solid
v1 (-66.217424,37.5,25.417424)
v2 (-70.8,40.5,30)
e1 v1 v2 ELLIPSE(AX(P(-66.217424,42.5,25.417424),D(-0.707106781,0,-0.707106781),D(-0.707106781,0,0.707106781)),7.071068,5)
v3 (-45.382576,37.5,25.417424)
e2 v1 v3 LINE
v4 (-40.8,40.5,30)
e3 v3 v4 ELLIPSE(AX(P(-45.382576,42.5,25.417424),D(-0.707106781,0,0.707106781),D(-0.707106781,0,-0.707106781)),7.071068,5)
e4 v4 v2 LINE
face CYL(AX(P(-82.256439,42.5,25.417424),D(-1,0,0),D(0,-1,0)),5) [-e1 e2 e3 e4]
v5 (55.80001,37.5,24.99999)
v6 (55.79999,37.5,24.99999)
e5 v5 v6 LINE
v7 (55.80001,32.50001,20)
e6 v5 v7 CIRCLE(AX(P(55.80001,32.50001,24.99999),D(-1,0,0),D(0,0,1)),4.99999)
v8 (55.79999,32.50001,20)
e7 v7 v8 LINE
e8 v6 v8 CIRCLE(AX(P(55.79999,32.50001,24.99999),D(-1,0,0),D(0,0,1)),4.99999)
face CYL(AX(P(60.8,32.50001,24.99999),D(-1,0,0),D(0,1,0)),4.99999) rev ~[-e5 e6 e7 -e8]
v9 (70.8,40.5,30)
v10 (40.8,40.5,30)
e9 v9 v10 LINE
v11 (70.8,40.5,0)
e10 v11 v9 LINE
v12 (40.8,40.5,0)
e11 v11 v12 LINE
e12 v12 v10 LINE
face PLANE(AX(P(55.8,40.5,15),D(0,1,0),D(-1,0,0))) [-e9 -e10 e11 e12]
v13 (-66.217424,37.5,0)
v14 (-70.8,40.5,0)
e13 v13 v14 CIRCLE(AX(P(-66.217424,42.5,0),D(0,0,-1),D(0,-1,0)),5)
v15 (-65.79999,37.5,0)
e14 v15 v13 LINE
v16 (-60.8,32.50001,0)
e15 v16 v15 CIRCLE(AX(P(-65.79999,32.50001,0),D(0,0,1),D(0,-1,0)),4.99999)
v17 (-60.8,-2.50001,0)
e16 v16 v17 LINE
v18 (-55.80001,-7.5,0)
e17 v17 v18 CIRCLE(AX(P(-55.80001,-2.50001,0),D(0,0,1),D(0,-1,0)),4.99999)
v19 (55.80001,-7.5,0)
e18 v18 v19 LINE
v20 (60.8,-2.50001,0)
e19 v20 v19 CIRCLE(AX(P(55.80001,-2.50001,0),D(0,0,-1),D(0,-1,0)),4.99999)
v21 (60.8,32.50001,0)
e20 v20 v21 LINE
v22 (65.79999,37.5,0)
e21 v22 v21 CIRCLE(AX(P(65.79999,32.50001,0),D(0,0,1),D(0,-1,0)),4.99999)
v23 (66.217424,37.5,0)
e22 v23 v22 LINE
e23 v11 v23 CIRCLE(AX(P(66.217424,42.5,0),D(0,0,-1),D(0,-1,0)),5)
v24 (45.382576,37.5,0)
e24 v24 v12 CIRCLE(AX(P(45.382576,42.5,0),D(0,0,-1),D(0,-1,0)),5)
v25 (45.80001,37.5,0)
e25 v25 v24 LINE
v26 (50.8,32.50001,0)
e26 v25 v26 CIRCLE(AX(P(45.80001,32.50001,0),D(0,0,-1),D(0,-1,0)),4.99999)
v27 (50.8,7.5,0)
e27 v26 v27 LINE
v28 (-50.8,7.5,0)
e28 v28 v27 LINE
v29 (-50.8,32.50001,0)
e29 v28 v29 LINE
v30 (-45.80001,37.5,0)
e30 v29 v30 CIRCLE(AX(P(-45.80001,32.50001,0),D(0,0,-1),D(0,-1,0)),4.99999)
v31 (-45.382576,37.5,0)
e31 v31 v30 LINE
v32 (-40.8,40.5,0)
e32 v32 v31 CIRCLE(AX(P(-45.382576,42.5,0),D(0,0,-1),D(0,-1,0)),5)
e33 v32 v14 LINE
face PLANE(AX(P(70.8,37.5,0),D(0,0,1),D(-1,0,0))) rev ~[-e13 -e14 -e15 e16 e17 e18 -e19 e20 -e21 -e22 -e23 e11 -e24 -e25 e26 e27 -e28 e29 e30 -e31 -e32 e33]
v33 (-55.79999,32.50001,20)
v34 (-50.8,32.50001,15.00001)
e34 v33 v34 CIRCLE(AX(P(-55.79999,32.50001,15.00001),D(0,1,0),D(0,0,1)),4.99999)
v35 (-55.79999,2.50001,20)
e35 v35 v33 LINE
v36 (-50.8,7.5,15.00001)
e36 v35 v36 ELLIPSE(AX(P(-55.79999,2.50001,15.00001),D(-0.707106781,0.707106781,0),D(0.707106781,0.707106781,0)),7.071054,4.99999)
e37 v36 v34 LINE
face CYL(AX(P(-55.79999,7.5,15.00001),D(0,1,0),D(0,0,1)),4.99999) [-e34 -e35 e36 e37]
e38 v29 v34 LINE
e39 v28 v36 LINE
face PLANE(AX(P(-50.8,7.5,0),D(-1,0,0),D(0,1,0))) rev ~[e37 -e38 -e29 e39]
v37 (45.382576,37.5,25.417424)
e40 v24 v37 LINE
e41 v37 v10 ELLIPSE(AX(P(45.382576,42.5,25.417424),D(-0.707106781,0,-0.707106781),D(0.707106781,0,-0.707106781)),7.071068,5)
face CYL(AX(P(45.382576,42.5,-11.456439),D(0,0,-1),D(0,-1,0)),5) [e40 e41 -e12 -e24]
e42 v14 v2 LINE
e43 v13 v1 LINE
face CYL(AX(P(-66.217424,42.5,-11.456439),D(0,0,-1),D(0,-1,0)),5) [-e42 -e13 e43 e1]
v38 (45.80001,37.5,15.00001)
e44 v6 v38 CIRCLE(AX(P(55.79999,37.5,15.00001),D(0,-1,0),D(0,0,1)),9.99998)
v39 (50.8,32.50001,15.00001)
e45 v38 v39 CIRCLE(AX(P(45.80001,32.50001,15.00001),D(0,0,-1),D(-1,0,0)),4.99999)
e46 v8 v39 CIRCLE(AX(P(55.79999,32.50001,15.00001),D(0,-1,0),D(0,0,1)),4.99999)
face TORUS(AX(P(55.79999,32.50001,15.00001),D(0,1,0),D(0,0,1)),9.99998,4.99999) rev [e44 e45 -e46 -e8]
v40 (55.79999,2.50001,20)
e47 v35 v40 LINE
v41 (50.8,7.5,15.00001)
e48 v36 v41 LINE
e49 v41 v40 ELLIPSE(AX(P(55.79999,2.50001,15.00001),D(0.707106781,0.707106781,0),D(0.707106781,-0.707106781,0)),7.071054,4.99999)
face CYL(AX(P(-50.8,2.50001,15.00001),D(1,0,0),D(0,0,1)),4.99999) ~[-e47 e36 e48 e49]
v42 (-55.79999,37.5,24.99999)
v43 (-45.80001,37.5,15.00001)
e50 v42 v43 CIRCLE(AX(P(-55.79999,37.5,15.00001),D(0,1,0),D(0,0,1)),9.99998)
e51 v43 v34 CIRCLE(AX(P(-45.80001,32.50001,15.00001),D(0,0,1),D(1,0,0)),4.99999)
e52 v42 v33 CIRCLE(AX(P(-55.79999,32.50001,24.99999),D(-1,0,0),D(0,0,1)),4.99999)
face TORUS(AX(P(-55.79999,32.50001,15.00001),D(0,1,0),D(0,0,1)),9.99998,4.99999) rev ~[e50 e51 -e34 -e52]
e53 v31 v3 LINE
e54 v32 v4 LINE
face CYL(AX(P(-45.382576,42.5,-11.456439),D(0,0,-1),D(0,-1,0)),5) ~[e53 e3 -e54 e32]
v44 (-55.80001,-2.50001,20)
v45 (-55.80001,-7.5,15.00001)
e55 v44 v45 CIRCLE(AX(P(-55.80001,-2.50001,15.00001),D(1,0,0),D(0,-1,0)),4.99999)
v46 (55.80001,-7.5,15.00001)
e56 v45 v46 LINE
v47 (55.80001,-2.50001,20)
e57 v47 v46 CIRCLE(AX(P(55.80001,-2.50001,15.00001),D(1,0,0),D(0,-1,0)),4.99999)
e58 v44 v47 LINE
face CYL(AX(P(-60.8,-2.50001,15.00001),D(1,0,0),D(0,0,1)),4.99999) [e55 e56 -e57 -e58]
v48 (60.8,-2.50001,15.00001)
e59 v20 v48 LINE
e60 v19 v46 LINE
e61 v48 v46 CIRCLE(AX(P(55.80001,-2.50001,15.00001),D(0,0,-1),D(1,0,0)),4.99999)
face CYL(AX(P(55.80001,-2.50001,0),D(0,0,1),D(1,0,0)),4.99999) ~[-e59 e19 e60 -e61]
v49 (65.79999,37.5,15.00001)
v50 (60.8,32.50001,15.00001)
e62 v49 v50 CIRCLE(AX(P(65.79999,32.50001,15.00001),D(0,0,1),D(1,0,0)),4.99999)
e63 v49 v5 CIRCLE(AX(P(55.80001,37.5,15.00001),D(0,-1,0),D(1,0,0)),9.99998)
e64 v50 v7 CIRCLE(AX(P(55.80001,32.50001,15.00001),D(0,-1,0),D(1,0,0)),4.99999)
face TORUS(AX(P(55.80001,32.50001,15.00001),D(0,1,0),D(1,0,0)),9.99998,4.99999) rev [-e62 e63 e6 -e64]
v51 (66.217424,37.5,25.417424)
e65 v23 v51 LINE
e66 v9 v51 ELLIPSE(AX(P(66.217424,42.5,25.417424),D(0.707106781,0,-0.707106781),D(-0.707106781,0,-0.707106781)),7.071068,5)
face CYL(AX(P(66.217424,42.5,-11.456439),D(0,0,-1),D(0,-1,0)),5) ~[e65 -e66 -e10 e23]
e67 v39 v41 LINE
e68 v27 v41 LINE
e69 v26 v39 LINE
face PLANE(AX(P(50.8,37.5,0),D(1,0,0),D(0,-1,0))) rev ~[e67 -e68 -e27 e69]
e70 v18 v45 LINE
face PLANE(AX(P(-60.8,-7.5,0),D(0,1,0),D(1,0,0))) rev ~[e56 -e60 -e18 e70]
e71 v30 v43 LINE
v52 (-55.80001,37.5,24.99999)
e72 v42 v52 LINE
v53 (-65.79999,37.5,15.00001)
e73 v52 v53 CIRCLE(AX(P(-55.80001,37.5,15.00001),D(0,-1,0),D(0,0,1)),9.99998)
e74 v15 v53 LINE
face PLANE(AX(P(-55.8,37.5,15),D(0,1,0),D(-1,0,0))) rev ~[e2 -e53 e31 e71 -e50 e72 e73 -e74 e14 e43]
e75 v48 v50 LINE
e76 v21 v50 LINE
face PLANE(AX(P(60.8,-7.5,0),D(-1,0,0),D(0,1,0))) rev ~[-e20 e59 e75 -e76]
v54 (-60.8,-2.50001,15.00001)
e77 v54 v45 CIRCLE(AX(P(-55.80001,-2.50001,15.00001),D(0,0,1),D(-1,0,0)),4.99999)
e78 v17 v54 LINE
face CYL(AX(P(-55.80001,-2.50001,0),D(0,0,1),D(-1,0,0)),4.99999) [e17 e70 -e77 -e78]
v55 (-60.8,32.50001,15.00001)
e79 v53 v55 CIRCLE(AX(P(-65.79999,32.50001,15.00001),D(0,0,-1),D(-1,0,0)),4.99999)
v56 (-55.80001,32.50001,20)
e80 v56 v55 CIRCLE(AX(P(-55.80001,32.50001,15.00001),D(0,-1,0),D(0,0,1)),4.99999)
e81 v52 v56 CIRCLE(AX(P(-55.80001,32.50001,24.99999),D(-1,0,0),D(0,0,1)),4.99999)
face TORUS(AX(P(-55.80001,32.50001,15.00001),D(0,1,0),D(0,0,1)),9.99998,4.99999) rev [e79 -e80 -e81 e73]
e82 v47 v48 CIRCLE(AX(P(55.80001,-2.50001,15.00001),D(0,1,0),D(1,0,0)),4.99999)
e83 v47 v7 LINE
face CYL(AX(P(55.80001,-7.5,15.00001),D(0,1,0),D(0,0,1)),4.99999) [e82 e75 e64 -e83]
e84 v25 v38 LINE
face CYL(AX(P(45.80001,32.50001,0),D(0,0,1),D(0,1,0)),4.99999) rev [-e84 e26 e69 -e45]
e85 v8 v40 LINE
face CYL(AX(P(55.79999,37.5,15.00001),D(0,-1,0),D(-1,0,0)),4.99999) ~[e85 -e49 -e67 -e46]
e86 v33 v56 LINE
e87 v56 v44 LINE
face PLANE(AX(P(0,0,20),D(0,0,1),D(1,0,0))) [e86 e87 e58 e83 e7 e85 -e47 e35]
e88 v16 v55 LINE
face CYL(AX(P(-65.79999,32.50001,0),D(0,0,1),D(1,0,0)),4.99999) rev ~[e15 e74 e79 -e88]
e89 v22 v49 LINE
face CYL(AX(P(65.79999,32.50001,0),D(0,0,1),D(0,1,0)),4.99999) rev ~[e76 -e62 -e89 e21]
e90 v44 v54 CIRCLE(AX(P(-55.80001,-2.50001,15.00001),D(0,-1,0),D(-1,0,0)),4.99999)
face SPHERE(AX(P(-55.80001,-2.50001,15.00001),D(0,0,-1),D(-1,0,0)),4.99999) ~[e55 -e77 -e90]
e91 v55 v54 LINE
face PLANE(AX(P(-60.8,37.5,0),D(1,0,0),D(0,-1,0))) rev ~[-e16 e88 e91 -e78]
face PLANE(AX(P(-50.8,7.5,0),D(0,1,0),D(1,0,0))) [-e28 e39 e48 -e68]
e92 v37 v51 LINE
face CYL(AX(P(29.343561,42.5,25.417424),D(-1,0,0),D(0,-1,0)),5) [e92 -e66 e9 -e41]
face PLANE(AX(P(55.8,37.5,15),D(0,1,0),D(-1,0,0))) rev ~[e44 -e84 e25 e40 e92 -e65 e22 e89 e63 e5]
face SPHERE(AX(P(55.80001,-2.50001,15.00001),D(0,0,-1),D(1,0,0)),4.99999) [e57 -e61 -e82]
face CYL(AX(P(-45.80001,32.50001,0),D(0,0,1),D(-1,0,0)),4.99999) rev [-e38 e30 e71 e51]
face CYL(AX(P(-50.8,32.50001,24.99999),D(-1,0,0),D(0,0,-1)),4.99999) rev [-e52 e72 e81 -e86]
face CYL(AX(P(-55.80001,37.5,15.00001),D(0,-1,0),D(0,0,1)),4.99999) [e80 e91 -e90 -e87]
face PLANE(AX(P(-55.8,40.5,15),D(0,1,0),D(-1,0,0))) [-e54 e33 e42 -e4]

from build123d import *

# Parameters (mm, degrees)
F0_W        = 101.6
F0_H        = 15
F1_DEPTH    = 20
F2_W        = 30
F2_H        = 30
F3_DEPTH    = 3
F4_R        = 4.99999
F5_T1_DEPTH = 52.9128784748
F5_T3_DEPTH = 52.9128784748
F5_T5_DEPTH = 52.9128784748


# Not quite as in the source:
# - a fillet or chamfer that OpenCascade refuses, or shapes differently, is made with other operations: its cross-section is extruded or revolved along the edge and cut away or added
# - a fillet or chamfer is up to 0.001 mm smaller than in the source, because OpenCascade refuses the exact size
# - a feature of the source that left no trace in its solid (it failed there, or was rolled back) is left out


with BuildPart() as f1:
    # F0 (on Top) → F1 (new body)
    with BuildSketch(Plane.XY):
        Rectangle(F0_W, F0_H)
        Polygon((50.8, 7.5), (50.8, -7.5), (60.8, -7.5), (60.8, 37.5), (50.8, 37.5), align=None)
        Polygon((-60.8, -7.5), (-50.8, -7.5), (-50.8, 7.5), (-50.8, 37.5), (-60.8, 37.5), align=None)
    extrude(amount=F1_DEPTH)

    # F2 (on face) → F3 (join)
    with BuildSketch(Plane(origin=(0, 37.5, 0), x_dir=(-1, 0, 0), z_dir=(0, 1, 0))):
        with Locations((-55.8, 15)):
            Rectangle(F2_W, F2_H)
        with Locations((55.8, 15)):
            Rectangle(F2_W, F2_H)
    extrude(amount=F3_DEPTH)

    # F4 (radius 5 in the source; OpenCascade refuses exactly that, so slightly less here)
    f4_edges = [f1.edges().sort_by_distance(p)[0] for p in [
        (-55.8, 37.5, 20),
        (-50.8, 37.5, 10),
        (-60.8, 37.5, 10),
        (-60.8, -7.5, 10),
        (60.8, -7.5, 10),
        (60.8, 37.5, 10),
        (55.8, 37.5, 20),
        (50.8, 37.5, 10),
        (60.8, 15, 20),
        (50.8, 22.5, 20),
        (0, 7.5, 20),
        (-50.8, 22.5, 20),
        (-60.8, 15, 20),
        (0, -7.5, 20),
    ]]
    fillet(f4_edges, radius=F4_R)

    # F5: fillet of radius 5 on 6 edges, made by hand

    # F5_s2 → F5_t1 (cut)
    with BuildSketch(Plane.YZ.offset(-82.2564392374)):
        with BuildLine():
            ThreePointArc((37.5, 25.417424305), (38.3166998673, 28.1560370926), (40.5, 30))
            Line((40.5, 30), (37.5, 30))
            Line((37.5, 30), (37.5, 25.417424305))
        make_face()
    extrude(amount=F5_T1_DEPTH, mode=Mode.SUBTRACT)

    # F5_s4 → F5_t3 (cut)
    with BuildSketch(Plane.XY.offset(-11.4564392374)):
        with BuildLine():
            ThreePointArc((-66.217424305, 37.5), (-68.9560370926, 38.3166998673), (-70.8, 40.5))
            Line((-70.8, 40.5), (-70.8, 37.5))
            Line((-70.8, 37.5), (-66.217424305, 37.5))
        make_face()
        with BuildLine():
            ThreePointArc((-45.382575695, 37.5), (-42.6439629074, 38.3166998673), (-40.8, 40.5))
            Line((-40.8, 40.5), (-40.8, 37.5))
            Line((-40.8, 37.5), (-45.382575695, 37.5))
        make_face()
        with BuildLine():
            ThreePointArc((45.382575695, 37.5), (42.6439629074, 38.3166998673), (40.8, 40.5))
            Line((40.8, 40.5), (40.8, 37.5))
            Line((40.8, 37.5), (45.382575695, 37.5))
        make_face()
        with BuildLine():
            ThreePointArc((66.217424305, 37.5), (68.9560370926, 38.3166998673), (70.8, 40.5))
            Line((70.8, 40.5), (70.8, 37.5))
            Line((70.8, 37.5), (66.217424305, 37.5))
        make_face()
    extrude(amount=F5_T3_DEPTH, mode=Mode.SUBTRACT)

    # F5_s6 → F5_t5 (cut)
    with BuildSketch(Plane.YZ.offset(29.3435607626)):
        with BuildLine():
            ThreePointArc((37.5, 25.417424305), (38.3166998673, 28.1560370926), (40.5, 30))
            Line((40.5, 30), (37.5, 30))
            Line((37.5, 30), (37.5, 25.417424305))
        make_face()
    extrude(amount=F5_T5_DEPTH, mode=Mode.SUBTRACT)


solid = f1.part
